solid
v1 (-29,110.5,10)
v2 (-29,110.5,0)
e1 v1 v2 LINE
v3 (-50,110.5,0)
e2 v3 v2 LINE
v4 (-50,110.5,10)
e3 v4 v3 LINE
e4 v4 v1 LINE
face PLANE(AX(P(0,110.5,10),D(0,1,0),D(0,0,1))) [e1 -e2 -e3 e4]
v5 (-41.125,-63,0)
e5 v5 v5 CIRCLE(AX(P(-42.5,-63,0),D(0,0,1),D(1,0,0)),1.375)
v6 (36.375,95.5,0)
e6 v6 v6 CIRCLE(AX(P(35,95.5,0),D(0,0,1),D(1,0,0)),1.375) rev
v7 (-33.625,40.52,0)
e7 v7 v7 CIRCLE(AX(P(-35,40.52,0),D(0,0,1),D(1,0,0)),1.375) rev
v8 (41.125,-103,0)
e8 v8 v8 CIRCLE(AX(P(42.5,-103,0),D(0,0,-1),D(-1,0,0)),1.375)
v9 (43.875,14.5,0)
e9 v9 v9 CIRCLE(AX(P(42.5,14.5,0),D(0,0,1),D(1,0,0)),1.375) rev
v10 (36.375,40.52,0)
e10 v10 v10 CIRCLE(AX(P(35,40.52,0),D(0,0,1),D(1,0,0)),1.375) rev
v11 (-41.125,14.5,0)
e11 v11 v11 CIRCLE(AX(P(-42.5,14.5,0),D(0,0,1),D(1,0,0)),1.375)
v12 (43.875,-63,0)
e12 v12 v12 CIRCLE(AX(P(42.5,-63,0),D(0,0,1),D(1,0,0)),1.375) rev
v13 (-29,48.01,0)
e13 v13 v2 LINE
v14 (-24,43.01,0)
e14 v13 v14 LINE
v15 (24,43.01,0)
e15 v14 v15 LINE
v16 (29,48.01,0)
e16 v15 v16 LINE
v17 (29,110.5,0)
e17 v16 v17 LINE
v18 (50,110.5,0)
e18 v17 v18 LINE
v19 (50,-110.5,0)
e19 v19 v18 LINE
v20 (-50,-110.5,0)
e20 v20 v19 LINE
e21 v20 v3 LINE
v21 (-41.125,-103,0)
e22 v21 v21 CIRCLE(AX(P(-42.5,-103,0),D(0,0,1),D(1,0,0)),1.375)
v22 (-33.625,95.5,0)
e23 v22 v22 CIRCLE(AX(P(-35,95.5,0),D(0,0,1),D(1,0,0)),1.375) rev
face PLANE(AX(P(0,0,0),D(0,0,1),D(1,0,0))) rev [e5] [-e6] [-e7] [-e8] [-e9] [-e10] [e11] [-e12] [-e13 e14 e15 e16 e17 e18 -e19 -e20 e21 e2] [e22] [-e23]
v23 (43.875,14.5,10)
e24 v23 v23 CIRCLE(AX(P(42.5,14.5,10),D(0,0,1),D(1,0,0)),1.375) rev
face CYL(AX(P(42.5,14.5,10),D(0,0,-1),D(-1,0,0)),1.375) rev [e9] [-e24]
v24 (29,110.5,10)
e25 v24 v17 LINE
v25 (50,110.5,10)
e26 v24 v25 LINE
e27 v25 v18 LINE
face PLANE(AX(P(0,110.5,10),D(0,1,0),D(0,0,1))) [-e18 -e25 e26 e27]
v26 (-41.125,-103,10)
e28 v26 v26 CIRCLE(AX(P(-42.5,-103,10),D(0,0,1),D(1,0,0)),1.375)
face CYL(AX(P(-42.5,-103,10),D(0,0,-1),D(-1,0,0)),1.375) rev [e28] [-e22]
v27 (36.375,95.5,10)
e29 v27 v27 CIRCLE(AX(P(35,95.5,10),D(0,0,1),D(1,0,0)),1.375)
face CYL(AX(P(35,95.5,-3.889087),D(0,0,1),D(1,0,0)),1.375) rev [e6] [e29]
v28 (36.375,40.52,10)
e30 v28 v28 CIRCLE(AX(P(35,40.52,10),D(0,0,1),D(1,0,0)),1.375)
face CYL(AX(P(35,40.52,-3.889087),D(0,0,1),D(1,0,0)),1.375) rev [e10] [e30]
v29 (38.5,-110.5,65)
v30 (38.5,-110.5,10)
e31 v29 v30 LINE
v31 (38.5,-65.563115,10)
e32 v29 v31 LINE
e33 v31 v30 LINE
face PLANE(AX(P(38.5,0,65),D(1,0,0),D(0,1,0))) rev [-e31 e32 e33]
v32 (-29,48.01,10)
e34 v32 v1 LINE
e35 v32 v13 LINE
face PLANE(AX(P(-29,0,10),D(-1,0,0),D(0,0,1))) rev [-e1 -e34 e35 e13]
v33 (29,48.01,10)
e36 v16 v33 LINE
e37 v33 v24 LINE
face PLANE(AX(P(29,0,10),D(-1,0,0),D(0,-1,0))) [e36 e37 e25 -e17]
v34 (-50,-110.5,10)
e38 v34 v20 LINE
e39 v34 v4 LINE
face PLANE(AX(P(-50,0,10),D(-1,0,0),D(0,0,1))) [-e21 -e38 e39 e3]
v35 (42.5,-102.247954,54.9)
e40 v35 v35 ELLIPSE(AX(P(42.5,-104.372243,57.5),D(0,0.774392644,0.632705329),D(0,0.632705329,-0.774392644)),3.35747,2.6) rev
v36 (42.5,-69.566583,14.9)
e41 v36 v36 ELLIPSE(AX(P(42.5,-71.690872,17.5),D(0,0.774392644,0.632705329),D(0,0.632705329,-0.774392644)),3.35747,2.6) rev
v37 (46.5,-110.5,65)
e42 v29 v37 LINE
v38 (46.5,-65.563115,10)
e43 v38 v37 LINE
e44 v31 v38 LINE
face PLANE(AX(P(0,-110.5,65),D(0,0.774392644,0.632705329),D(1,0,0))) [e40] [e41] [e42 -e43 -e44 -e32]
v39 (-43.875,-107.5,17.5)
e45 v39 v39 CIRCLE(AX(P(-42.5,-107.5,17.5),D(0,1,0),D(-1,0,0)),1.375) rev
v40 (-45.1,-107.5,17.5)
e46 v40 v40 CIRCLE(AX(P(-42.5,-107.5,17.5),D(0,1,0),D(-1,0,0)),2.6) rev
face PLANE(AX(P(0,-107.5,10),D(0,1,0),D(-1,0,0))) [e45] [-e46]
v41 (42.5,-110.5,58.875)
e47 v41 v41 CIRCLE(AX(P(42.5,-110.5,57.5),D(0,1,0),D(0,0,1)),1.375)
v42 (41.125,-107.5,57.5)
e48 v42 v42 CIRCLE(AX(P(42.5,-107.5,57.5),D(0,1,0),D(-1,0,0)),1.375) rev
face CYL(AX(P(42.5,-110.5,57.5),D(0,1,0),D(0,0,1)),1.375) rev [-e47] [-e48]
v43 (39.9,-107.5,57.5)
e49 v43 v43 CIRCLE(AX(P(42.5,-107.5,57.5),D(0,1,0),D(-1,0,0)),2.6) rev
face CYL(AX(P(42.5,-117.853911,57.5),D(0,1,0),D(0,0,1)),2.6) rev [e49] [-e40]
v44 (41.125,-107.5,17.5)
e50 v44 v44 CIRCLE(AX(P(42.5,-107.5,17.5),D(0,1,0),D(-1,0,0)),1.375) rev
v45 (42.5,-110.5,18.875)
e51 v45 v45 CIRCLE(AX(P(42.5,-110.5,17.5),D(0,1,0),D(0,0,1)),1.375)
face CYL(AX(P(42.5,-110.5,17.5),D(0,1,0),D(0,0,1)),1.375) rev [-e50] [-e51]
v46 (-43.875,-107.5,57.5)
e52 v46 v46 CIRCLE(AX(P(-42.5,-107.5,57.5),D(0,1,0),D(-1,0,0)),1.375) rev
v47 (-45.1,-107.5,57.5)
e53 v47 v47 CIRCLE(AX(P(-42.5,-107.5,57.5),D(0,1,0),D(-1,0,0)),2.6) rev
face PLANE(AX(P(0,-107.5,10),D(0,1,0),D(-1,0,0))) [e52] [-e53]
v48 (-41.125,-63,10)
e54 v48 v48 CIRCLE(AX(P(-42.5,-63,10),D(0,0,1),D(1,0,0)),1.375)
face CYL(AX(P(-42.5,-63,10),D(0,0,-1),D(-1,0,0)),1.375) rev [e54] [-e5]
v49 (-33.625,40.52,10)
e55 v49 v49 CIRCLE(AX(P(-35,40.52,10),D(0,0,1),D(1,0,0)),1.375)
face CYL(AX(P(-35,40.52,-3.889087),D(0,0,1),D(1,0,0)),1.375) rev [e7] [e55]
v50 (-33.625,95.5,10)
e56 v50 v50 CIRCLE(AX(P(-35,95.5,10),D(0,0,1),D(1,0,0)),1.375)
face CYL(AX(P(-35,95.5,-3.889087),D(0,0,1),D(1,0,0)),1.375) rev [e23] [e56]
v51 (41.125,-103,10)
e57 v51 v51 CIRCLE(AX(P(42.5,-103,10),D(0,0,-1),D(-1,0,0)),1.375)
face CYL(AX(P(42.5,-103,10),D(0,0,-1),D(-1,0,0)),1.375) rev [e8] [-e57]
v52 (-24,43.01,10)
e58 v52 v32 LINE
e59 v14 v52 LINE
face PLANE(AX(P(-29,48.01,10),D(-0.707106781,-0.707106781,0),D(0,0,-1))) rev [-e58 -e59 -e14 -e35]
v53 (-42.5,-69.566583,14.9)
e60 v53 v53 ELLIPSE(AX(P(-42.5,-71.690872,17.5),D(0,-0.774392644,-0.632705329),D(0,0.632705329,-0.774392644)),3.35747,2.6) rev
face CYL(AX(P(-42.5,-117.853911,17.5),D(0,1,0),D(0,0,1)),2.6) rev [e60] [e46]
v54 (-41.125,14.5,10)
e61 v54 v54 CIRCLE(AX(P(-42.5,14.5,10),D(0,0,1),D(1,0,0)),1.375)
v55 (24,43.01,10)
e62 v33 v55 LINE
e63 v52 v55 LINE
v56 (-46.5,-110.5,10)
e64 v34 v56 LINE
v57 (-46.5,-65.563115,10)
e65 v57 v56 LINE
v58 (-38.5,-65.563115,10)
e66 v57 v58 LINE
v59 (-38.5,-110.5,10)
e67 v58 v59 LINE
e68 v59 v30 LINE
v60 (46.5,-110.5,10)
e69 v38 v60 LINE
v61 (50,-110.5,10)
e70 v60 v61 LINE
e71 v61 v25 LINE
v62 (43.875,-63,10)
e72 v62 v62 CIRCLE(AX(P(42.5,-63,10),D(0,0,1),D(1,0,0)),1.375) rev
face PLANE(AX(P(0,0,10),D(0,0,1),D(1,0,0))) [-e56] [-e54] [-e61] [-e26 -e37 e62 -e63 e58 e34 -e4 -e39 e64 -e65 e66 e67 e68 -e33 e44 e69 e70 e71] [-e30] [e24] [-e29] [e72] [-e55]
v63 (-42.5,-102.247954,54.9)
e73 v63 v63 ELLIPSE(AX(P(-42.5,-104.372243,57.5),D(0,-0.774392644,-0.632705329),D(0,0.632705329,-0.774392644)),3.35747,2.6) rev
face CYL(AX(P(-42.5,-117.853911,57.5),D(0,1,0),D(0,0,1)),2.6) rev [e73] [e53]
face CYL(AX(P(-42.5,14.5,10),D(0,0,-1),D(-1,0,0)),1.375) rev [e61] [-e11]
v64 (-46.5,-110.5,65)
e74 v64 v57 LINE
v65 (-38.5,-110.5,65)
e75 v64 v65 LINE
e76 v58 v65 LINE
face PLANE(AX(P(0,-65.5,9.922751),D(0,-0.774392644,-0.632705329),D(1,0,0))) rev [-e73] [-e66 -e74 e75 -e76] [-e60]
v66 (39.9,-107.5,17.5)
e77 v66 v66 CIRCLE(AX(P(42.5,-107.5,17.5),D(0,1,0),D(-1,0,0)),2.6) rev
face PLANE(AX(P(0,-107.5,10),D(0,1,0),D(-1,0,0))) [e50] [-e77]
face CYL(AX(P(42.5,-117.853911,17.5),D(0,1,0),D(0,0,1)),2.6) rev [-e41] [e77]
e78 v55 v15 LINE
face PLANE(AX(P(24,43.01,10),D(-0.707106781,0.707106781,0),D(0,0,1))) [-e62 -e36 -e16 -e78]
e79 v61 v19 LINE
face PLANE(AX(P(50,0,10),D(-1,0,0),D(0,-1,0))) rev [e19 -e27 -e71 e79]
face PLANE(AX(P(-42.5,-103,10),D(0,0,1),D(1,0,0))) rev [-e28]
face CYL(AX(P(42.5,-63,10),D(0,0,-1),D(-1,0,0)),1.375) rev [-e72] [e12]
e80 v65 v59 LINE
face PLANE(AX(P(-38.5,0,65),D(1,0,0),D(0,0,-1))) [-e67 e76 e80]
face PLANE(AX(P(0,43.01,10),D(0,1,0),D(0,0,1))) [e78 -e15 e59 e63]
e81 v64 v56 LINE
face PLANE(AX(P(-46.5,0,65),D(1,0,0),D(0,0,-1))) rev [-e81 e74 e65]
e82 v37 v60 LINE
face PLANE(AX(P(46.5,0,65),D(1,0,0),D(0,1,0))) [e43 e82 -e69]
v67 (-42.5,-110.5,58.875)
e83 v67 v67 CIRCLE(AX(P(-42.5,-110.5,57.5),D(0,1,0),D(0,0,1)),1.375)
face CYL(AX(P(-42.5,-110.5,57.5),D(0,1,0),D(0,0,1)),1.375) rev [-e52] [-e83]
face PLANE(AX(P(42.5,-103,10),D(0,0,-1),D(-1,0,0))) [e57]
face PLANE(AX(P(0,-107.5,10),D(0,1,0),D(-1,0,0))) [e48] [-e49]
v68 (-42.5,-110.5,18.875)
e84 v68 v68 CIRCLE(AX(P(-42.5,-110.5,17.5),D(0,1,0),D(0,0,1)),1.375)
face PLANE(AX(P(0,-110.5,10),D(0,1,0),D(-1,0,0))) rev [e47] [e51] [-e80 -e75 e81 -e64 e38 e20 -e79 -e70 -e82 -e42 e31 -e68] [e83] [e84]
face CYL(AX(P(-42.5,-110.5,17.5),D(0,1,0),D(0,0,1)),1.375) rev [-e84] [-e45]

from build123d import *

# Parameters (mm, degrees)
SKETCH1_R           = 1.375
BOSS_EXTRUDE1_DEPTH = 10
CHAMFER1_SIZE       = 5
SKETCH2_W           = 8
SKETCH2_H           = 45
BOSS_EXTRUDE2_DEPTH = 55
SKETCH5_R           = 1.375
CUT_EXTRUDE2_DEPTH  = 186.151289491
SKETCH5_3_R         = 2.6
CUT_EXTRUDE3_DEPTH  = 52
SKETCH1_3_R         = 1.375
CUT_EXTRUDE4_DEPTH  = 10
CHAMFER3_SIZE       = 55.077249093
CHAMFER3_SIZE_2     = 45
SKETCH6_R           = 1.375
CUT_EXTRUDE5_DEPTH  = 10


with BuildPart() as part:
    # Sketch1 → Boss-Extrude1 (new body)
    with BuildSketch(Plane.XY):
        Polygon((-50, 110.5), (-50, -110.5), (50, -110.5), (50, 110.5), (29, 110.5), (29, 43.01), (-29, 43.01), (-29, 110.5), align=None)
        with BuildLine():
            ThreePointArc((-42.5, -64.375), (-43.875, -63), (-42.5, -61.625))
            ThreePointArc((-42.5, -61.625), (-41.125, -63), (-42.5, -64.375))
        make_face(mode=Mode.SUBTRACT)
        with Locations((42.5, -63)):
            Circle(SKETCH1_R, mode=Mode.SUBTRACT)
        with BuildLine():
            ThreePointArc((-42.5, 15.875), (-41.125, 14.5), (-42.5, 13.125))
            ThreePointArc((-42.5, 13.125), (-43.875, 14.5), (-42.5, 15.875))
        make_face(mode=Mode.SUBTRACT)
        with Locations((42.5, 14.5)):
            Circle(SKETCH1_R, mode=Mode.SUBTRACT)
    extrude(amount=BOSS_EXTRUDE1_DEPTH)

    # Chamfer1
    chamfer1_edges = [part.edges().sort_by_distance(p)[0] for p in [
        (29, 43.01, 5),
        (-29, 43.01, 5),
    ]]
    chamfer(chamfer1_edges, length=CHAMFER1_SIZE)

    # Sketch2 → Boss-Extrude2 (add)
    with BuildSketch(Plane.XY.offset(10)):
        with Locations((-42.5, -88)):
            Rectangle(SKETCH2_W, SKETCH2_H)
        with Locations((42.5, -88)):
            Rectangle(SKETCH2_W, SKETCH2_H)
    extrude(amount=BOSS_EXTRUDE2_DEPTH)

    # Sketch5 → Cut-Extrude2 (cut, through all)
    with BuildSketch(Plane(origin=(0, -55.5, 0), x_dir=(1, 0, 0), z_dir=(0, 1, 0))):
        with Locations(Location((-42.5, -17.5, 0), (0, 0, 270))):
            Circle(SKETCH5_R)
        with Locations(Location((-42.5, -57.5, 0), (0, 0, 270))):
            Circle(SKETCH5_R)
        with Locations(Location((42.5, -17.5, 0), (0, 0, 270))):
            Circle(SKETCH5_R)
        with Locations(Location((42.5, -57.5, 0), (0, 0, 270))):
            Circle(SKETCH5_R)
    extrude(amount=-CUT_EXTRUDE2_DEPTH, mode=Mode.SUBTRACT)

    # Sketch5<3> → Cut-Extrude3 (cut)
    with BuildSketch(Plane(origin=(0, -55.5, 0), x_dir=(1, 0, 0), z_dir=(0, 1, 0))):
        with Locations(Location((-42.5, -17.5, 0), (0, 0, 270))):
            Circle(SKETCH5_3_R)
        with Locations(Location((-42.5, -57.5, 0), (0, 0, 270))):
            Circle(SKETCH5_3_R)
        with Locations(Location((42.5, -17.5, 0), (0, 0, 180))):
            Circle(SKETCH5_3_R)
        with Locations(Location((42.5, -57.5, 0), (0, 0, 180))):
            Circle(SKETCH5_3_R)
    extrude(amount=-CUT_EXTRUDE3_DEPTH, mode=Mode.SUBTRACT)

    # Sketch1<3> → Cut-Extrude4 (cut)
    with BuildSketch(Plane.XY):
        with Locations((-42.5, -103)):
            Circle(SKETCH1_3_R)
        with Locations(Location((42.5, -103, 0), (0, 0, 180))):
            Circle(SKETCH1_3_R)
    extrude(amount=CUT_EXTRUDE4_DEPTH, mode=Mode.SUBTRACT)

    # Chamfer3
    # the kernel refuses this chamfer: 55.077249093, 45 mm, written as the material it takes off along each edge
    with BuildSketch(Plane(origin=(188.501029674, -65.5, 65), x_dir=(0, 0.02454043401221108, -0.9996988382000312), z_dir=(-1, 0, 0))) as chamfer3_piece_1_section:
        Polygon((CHAMFER3_SIZE * 0.9996988382, CHAMFER3_SIZE * 0.0245404340122), (-CHAMFER3_SIZE_2 * 0.0245404340122, CHAMFER3_SIZE_2 * 0.9996988382), (0, 0), align=None)
    chamfer3_piece_1 = extrude(amount=292.002059347, mode=Mode.PRIVATE)
    chamfer3_piece_1 = split(chamfer3_piece_1, bisect_by=Plane(origin=(42.5, -80.263234933, 10), z_dir=(0, 0, 1)), keep=Keep.TOP, mode=Mode.PRIVATE)
    add(chamfer3_piece_1, mode=Mode.SUBTRACT)
    with BuildSketch(Plane(origin=(103.501029674, -65.5, 65), x_dir=(0, 0.02454043401221108, -0.9996988382000312), z_dir=(-1, 0, 0))) as chamfer3_piece_2_section:
        Polygon((CHAMFER3_SIZE * 0.9996988382, CHAMFER3_SIZE * 0.0245404340122), (-CHAMFER3_SIZE_2 * 0.0245404340122, CHAMFER3_SIZE_2 * 0.9996988382), (0, 0), align=None)
    chamfer3_piece_2 = extrude(amount=292.002059347, mode=Mode.PRIVATE)
    chamfer3_piece_2 = split(chamfer3_piece_2, bisect_by=Plane(origin=(42.5, -80.263234933, 10), z_dir=(0, 0, 1)), keep=Keep.TOP, mode=Mode.PRIVATE)
    add(chamfer3_piece_2, mode=Mode.SUBTRACT)

    # Sketch6 → Cut-Extrude5 (cut)
    with BuildSketch(Plane.XY.offset(10)):
        with Locations((-35, 95.5)):
            Circle(SKETCH6_R)
        with Locations((35, 95.5)):
            Circle(SKETCH6_R)
        with Locations((35, 40.52)):
            Circle(SKETCH6_R)
        with Locations((-35, 40.52)):
            Circle(SKETCH6_R)
    extrude(amount=-CUT_EXTRUDE5_DEPTH, mode=Mode.SUBTRACT)


solid = part.part
